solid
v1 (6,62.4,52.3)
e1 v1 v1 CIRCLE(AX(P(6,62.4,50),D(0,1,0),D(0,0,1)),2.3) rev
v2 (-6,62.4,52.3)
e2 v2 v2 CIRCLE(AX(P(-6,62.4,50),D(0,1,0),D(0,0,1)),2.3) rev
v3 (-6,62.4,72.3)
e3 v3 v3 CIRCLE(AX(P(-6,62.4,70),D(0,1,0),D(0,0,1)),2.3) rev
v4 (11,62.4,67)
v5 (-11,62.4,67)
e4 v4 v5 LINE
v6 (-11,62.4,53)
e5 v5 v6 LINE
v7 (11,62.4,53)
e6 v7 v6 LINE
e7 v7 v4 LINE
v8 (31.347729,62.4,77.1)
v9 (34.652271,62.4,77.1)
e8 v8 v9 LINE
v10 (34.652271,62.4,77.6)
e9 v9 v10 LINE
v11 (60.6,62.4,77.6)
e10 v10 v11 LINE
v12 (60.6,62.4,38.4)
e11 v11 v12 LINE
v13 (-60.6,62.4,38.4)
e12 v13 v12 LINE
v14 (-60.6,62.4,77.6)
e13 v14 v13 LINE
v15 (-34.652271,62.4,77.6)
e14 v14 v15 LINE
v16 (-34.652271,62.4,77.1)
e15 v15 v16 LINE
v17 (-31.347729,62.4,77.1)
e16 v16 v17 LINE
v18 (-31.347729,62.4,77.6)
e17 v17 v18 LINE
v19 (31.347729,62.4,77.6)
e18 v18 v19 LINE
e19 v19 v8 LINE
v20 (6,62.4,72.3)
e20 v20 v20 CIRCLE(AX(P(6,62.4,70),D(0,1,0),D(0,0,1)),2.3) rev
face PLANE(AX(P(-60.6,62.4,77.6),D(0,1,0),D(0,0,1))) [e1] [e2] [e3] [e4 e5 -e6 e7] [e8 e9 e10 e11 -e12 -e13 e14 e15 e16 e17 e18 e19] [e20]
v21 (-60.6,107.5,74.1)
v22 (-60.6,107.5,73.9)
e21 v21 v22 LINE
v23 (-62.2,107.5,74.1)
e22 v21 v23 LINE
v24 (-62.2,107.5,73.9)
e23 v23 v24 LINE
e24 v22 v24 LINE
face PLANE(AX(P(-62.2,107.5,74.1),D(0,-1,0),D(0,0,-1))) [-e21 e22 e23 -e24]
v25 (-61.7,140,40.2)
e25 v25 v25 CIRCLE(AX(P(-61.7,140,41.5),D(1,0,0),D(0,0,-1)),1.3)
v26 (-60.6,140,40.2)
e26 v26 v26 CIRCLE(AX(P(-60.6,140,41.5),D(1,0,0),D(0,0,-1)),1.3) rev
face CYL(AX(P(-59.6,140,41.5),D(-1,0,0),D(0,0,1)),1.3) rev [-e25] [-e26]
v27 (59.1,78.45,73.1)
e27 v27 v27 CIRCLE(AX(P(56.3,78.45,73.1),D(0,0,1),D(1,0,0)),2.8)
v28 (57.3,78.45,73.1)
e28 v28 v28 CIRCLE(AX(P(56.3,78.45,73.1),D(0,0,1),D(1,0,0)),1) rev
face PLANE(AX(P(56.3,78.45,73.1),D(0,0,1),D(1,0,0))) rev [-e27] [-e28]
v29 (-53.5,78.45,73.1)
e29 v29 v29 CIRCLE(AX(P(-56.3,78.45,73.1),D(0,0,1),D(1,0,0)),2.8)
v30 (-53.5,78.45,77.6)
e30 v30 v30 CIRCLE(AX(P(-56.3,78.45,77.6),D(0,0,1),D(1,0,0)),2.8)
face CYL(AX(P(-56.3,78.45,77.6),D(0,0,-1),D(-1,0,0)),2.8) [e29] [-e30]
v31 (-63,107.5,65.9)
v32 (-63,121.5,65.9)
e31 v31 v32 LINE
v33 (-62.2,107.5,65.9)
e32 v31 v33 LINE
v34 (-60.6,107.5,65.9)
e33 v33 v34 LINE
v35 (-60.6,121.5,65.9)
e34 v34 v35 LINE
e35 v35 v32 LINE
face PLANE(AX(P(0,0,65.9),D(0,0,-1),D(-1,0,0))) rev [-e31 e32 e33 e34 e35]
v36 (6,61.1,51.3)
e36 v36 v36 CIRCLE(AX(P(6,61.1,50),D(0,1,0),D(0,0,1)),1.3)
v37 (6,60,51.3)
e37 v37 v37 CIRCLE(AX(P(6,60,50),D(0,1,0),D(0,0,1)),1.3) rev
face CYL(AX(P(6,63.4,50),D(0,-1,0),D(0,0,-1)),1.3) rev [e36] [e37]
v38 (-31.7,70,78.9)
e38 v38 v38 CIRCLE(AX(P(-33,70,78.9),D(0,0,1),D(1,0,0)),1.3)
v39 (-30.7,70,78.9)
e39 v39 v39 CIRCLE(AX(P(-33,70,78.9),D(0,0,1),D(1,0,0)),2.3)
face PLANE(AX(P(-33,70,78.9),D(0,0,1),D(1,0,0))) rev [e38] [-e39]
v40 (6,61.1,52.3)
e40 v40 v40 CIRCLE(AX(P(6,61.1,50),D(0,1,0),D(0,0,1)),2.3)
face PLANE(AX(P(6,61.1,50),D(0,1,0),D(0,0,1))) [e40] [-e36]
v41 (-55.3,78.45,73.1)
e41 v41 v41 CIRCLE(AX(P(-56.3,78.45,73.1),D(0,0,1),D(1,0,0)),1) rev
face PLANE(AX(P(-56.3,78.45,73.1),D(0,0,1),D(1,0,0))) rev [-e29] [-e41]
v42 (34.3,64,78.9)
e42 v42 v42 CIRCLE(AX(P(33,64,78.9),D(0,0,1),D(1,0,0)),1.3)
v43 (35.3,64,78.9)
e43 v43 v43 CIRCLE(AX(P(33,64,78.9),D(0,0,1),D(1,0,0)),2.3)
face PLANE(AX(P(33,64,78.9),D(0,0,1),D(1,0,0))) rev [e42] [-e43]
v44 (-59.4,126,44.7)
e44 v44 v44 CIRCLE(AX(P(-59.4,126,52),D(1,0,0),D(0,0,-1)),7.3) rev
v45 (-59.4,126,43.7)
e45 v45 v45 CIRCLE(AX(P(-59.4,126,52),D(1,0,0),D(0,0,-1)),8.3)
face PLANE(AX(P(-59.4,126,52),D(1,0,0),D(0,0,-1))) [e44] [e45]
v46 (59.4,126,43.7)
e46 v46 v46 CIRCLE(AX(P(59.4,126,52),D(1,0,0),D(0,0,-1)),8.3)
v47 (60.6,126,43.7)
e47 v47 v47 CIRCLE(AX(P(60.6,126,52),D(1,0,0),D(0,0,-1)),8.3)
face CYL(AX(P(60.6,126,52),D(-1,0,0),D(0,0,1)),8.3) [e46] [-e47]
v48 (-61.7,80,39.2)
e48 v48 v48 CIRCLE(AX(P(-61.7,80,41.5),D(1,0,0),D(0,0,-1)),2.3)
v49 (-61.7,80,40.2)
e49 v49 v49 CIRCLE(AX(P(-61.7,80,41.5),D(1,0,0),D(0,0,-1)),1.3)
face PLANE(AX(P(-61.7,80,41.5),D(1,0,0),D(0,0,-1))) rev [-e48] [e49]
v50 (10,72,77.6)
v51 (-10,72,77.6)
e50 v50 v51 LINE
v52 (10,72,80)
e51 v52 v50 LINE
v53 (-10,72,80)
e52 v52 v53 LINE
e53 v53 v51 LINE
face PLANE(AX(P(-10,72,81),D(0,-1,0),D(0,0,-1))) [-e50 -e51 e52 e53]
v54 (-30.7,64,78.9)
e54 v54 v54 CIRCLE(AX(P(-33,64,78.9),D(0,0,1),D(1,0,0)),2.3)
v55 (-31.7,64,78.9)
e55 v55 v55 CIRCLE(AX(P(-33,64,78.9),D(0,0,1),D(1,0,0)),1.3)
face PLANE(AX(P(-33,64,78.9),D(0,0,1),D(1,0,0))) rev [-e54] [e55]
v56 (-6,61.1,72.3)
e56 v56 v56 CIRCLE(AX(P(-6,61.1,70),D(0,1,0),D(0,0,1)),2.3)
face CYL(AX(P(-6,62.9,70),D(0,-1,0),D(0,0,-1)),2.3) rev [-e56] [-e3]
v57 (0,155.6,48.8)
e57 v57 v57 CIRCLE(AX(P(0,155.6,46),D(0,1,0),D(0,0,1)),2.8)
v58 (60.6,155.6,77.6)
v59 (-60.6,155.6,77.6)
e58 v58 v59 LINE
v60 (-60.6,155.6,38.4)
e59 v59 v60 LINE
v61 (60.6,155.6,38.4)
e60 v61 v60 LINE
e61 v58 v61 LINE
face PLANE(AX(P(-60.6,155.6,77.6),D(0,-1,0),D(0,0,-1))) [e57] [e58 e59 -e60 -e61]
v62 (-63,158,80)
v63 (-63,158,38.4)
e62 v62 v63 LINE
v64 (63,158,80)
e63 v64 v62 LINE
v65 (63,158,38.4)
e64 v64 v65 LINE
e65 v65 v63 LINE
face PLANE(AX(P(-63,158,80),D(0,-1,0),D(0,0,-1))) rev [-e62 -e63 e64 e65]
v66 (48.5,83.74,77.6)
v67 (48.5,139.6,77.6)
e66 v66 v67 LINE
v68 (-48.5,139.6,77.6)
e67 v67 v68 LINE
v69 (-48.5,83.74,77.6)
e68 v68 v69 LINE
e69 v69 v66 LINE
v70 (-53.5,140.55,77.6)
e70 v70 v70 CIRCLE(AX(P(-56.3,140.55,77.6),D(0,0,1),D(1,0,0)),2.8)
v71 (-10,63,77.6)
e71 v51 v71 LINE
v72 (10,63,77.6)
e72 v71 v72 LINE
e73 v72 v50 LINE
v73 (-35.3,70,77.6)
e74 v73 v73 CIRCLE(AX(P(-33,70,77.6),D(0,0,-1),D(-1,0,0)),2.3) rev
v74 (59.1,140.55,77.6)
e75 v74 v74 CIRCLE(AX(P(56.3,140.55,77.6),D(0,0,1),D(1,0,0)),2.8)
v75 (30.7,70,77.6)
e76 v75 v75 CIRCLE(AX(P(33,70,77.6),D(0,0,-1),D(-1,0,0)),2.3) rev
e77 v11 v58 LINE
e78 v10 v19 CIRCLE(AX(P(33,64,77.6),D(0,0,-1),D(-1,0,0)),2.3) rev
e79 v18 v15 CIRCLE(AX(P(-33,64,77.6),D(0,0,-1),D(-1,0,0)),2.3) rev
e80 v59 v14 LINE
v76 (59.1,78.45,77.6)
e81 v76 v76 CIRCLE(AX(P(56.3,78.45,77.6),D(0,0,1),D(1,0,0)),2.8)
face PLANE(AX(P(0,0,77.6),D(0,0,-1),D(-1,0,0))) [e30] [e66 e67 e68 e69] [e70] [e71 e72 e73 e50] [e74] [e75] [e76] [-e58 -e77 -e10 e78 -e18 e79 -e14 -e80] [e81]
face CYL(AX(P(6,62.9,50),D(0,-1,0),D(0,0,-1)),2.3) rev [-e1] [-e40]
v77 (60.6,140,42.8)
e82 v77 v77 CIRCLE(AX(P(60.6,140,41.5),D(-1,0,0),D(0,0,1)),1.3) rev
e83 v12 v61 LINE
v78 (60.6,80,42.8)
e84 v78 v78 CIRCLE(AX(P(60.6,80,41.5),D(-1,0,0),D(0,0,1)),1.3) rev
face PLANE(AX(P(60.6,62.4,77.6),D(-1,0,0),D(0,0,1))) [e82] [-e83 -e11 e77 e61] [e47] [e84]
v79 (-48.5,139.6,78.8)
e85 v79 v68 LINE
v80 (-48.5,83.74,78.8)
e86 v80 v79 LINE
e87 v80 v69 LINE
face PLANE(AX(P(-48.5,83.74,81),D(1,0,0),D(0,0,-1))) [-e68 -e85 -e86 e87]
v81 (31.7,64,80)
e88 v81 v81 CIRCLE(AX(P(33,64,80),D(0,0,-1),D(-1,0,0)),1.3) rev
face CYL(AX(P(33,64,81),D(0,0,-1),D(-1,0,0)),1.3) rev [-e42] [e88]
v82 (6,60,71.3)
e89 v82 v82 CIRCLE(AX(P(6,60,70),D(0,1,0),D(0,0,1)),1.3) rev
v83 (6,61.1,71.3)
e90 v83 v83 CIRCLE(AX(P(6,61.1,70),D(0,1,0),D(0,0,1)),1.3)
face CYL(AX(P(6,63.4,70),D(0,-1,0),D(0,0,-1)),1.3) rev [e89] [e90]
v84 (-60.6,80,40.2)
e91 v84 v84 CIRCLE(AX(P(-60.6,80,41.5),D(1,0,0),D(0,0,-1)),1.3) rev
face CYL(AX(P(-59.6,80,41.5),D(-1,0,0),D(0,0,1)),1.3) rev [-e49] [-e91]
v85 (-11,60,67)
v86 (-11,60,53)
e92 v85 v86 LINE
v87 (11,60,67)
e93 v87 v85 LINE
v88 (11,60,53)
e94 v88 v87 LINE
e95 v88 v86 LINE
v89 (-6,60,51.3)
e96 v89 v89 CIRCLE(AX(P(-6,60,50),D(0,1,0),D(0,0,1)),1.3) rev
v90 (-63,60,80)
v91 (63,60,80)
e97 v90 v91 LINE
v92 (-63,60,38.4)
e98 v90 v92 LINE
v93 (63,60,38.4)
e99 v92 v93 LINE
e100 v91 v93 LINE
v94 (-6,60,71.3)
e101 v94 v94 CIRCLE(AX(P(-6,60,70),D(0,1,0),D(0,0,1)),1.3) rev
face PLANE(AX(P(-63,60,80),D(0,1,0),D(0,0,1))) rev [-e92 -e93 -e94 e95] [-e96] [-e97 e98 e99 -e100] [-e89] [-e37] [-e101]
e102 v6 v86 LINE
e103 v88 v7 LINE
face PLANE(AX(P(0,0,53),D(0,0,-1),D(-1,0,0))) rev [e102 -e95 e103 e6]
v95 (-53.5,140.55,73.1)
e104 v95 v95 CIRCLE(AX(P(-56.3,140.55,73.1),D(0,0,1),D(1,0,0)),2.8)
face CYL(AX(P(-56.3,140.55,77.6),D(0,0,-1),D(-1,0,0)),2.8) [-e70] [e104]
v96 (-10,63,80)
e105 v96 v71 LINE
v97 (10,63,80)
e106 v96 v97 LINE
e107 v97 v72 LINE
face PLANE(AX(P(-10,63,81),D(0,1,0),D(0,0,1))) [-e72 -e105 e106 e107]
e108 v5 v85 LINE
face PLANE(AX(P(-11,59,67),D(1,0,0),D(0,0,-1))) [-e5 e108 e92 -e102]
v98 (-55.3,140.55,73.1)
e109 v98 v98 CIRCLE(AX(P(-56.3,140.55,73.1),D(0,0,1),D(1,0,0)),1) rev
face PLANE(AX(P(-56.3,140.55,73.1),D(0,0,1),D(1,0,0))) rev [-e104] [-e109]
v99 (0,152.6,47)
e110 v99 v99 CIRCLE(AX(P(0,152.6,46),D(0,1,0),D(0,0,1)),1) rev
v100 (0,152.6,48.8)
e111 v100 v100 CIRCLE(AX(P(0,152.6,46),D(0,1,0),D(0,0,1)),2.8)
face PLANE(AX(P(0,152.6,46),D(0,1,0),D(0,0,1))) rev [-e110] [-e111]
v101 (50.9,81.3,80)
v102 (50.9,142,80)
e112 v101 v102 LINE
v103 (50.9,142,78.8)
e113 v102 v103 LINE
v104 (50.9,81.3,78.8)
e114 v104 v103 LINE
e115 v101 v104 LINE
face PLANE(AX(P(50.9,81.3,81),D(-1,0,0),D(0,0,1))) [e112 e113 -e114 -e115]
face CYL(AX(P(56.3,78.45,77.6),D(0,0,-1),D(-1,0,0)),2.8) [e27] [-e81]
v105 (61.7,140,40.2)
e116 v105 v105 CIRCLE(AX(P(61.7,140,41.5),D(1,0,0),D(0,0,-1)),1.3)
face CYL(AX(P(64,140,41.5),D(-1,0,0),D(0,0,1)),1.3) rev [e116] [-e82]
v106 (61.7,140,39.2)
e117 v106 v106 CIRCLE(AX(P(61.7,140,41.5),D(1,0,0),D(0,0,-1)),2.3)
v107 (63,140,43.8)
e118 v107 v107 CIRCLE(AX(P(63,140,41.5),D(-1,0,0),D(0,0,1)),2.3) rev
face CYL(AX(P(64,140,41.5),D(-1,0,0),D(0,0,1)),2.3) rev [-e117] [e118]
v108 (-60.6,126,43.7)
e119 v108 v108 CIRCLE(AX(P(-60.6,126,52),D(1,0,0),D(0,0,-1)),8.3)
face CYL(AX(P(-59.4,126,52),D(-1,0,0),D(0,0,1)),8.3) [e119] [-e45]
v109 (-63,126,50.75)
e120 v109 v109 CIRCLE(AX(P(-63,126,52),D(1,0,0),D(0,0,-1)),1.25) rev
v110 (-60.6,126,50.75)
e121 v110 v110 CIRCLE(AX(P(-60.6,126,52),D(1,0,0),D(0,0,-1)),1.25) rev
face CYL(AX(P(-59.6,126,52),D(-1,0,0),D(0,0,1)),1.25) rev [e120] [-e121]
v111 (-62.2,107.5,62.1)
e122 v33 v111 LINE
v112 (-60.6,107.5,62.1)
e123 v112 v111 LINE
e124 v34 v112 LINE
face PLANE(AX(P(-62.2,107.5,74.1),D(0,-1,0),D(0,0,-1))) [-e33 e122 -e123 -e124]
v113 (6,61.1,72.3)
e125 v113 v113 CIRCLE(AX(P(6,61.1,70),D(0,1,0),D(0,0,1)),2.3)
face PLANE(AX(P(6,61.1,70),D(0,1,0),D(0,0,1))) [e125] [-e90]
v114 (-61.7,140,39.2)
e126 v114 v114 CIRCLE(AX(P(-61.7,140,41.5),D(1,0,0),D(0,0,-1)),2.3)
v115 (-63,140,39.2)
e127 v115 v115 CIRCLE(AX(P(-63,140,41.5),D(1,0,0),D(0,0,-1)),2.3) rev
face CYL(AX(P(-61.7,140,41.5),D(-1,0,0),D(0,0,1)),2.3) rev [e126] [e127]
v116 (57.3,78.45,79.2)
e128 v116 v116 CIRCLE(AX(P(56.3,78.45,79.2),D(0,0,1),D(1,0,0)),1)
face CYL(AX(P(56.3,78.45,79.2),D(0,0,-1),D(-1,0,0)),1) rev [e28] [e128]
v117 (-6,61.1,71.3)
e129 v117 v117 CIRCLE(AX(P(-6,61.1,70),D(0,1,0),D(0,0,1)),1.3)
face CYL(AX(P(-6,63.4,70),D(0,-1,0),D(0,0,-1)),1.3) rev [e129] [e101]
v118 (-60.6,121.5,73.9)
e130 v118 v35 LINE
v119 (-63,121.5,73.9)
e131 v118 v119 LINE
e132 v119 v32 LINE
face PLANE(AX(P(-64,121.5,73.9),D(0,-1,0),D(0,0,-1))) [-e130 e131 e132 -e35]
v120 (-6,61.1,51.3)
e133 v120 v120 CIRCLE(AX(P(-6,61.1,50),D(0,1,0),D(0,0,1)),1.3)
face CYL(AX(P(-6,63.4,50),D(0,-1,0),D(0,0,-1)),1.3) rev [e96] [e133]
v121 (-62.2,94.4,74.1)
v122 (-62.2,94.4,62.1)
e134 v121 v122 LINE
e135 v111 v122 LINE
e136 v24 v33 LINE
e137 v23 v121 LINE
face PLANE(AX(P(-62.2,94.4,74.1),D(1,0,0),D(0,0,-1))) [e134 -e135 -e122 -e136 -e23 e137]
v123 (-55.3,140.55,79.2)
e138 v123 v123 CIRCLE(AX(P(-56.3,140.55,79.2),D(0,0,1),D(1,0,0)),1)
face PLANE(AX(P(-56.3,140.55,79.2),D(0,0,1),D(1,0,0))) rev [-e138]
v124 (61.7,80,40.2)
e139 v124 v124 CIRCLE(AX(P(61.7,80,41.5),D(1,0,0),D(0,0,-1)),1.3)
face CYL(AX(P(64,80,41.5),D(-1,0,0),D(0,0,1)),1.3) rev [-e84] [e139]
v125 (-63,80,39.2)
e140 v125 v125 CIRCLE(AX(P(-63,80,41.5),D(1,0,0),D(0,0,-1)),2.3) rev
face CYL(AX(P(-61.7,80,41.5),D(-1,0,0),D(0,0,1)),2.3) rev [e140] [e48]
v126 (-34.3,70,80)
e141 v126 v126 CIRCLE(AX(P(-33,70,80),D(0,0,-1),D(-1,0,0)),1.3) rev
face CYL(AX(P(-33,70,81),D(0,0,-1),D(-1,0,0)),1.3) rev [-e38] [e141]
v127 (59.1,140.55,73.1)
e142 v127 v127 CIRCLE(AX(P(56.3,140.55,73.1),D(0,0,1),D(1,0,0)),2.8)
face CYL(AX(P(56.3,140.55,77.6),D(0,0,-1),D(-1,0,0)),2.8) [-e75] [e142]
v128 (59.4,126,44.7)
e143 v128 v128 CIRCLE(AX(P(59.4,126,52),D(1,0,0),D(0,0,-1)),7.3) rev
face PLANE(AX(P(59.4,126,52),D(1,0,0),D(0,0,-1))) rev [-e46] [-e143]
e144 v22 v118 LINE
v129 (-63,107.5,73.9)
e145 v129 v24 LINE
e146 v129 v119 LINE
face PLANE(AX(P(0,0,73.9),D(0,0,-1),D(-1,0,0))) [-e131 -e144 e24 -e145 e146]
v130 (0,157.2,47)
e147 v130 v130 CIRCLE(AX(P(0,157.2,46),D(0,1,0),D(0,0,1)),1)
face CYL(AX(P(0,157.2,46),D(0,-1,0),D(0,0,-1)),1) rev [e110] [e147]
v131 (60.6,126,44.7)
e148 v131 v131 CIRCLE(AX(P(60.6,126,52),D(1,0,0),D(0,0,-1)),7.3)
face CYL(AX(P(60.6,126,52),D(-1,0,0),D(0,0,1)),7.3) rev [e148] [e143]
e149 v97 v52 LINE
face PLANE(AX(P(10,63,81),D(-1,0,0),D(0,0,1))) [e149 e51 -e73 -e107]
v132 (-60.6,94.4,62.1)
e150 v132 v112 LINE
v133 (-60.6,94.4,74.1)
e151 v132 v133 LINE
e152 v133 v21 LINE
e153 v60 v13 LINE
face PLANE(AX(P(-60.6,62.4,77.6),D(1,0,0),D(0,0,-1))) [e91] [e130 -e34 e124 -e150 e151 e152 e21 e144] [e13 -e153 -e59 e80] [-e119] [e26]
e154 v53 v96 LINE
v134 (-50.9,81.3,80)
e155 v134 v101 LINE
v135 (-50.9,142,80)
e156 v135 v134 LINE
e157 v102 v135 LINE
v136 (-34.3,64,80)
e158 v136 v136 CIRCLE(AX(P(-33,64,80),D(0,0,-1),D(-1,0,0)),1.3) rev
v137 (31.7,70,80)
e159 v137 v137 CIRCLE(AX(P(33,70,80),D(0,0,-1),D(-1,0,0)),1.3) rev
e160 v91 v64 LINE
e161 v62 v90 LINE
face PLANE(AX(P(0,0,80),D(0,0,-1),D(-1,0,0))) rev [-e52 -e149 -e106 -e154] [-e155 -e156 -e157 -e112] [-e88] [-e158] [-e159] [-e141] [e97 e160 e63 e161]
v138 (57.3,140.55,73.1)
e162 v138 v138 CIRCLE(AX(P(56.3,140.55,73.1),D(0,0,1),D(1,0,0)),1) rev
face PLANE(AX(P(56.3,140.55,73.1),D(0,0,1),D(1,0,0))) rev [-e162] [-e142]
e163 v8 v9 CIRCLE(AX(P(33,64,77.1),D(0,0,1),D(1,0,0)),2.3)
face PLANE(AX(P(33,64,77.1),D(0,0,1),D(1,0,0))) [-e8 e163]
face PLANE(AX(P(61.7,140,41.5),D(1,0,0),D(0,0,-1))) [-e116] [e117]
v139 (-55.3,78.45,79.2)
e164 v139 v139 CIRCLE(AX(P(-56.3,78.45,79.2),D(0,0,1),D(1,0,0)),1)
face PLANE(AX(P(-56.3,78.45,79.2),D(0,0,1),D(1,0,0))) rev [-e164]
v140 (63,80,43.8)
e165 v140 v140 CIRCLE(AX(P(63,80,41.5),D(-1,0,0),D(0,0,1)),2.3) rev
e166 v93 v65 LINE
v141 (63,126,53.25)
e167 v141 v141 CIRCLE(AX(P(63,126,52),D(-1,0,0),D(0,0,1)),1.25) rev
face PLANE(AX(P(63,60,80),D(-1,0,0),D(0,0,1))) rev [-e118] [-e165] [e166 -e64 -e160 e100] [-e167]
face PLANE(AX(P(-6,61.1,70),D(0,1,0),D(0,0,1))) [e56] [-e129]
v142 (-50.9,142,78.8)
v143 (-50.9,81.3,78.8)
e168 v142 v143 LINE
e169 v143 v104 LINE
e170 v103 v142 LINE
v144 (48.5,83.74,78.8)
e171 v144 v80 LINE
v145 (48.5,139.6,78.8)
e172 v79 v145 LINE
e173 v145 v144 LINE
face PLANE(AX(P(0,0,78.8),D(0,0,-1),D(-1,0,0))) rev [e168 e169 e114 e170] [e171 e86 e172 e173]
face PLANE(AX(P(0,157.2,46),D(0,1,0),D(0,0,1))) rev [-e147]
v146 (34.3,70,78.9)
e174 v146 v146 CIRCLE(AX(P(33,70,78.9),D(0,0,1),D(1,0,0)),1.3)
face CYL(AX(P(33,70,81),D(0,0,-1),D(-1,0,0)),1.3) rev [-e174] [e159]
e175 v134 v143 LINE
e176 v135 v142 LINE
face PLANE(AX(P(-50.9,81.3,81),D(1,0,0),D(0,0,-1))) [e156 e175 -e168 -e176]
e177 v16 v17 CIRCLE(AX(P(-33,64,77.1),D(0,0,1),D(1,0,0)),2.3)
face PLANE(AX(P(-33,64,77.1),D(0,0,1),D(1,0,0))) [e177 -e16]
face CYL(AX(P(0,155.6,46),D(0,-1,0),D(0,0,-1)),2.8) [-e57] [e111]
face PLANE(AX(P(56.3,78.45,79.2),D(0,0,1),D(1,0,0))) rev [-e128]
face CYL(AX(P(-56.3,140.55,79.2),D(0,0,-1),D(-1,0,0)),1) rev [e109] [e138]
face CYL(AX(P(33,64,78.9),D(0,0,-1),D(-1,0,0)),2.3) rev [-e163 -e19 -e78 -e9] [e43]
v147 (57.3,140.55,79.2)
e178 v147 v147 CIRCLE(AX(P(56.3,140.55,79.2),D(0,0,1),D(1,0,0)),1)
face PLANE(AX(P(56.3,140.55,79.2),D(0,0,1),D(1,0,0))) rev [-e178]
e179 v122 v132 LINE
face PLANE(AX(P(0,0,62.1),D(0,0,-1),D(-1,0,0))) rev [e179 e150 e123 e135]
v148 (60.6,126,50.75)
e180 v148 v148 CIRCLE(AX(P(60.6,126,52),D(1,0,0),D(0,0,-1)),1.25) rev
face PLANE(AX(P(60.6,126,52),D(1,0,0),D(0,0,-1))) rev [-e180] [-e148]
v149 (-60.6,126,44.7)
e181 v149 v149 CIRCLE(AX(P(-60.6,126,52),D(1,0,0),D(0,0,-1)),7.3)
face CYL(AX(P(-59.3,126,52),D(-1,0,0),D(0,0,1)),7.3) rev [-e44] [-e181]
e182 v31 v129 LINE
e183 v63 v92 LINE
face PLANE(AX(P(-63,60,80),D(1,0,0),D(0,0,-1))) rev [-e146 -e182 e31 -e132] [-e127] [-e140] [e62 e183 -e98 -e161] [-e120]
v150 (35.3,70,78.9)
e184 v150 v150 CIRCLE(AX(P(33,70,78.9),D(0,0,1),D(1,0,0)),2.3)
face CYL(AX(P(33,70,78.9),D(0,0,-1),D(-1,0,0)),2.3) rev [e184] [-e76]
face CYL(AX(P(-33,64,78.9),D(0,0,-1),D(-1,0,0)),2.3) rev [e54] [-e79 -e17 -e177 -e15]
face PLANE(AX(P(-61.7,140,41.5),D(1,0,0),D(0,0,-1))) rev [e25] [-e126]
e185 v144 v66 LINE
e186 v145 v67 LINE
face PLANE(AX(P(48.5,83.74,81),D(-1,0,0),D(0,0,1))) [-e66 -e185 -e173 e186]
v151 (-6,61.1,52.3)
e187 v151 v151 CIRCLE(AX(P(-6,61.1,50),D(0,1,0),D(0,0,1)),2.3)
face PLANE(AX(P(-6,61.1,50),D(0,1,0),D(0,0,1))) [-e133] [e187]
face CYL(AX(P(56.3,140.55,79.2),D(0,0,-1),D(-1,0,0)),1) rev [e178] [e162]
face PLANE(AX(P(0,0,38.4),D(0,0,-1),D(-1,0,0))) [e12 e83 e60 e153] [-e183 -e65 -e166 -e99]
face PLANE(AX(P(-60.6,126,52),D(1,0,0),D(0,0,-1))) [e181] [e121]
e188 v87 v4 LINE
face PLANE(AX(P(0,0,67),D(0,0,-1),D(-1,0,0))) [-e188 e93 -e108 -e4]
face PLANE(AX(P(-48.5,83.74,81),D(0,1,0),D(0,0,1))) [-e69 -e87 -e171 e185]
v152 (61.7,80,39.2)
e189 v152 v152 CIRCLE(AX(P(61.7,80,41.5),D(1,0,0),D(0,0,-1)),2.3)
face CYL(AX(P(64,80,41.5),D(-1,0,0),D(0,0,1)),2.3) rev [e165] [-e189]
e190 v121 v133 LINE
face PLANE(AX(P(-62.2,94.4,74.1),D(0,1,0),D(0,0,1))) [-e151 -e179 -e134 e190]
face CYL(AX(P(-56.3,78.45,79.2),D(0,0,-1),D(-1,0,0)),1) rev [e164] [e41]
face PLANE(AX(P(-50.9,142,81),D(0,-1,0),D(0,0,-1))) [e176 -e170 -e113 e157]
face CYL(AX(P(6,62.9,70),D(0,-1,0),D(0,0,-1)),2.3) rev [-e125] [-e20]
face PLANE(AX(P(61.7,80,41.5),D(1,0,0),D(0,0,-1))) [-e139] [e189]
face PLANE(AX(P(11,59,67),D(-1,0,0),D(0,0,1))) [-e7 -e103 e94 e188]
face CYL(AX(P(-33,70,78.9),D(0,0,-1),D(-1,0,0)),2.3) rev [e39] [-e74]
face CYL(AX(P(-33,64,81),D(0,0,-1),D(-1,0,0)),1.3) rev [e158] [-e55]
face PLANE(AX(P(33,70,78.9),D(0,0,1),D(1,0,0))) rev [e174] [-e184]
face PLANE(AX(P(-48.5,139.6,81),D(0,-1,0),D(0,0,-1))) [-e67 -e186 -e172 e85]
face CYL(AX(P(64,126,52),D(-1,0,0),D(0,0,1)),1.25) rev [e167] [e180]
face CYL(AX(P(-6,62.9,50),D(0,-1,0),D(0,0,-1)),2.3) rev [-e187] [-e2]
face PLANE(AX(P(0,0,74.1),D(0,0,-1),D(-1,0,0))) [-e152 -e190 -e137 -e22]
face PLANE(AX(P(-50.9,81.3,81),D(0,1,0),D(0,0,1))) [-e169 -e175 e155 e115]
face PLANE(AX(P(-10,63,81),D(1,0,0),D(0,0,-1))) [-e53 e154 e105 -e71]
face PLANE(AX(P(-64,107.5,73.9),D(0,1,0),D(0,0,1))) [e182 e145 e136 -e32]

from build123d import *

# Parameters (mm, degrees)
BOSS_EXTRUDE1_START  = 38.4
SKETCH1_W            = 126
SKETCH1_H            = 98
BOSS_EXTRUDE1_DEPTH  = 41.6
BOSS_EXTRUDE2_START  = 36
SKETCH2_W            = 121.2
SKETCH2_H            = 93.2
BOSS_EXTRUDE2_DEPTH  = 41.6
BOSS_EXTRUDE3_START  = 76.6
SKETCH3_W            = 97
SKETCH3_H            = 55.86
BOSS_EXTRUDE3_DEPTH  = 4.4
BOSS_EXTRUDE4_START  = 78.8
SKETCH4_W            = 101.8
SKETCH4_H            = 60.7
BOSS_EXTRUDE4_DEPTH  = 2.2
BOSS_EXTRUDE5_START  = 73.1
SKETCH5_R            = 2.8
BOSS_EXTRUDE5_DEPTH  = 4.5
BOSS_EXTRUDE6_START  = 72.1
SKETCH6_R            = 1
BOSS_EXTRUDE6_DEPTH  = 7.1
BOSS_EXTRUDE7_START  = 73.1
SKETCH7_R            = 2.8
BOSS_EXTRUDE7_DEPTH  = 4.5
BOSS_EXTRUDE8_START  = 72.1
SKETCH8_R            = 1
BOSS_EXTRUDE8_DEPTH  = 7.1
BOSS_EXTRUDE9_START  = 73.1
SKETCH9_R            = 2.8
BOSS_EXTRUDE9_DEPTH  = 4.5
BOSS_EXTRUDE10_START = 72.1
SKETCH10_R           = 1
BOSS_EXTRUDE10_DEPTH = 7.1
BOSS_EXTRUDE11_START = 73.1
SKETCH11_R           = 2.8
BOSS_EXTRUDE11_DEPTH = 4.5
BOSS_EXTRUDE12_START = 72.1
SKETCH12_R           = 1
BOSS_EXTRUDE12_DEPTH = 7.1
BOSS_EXTRUDE13_START = 65.9
SKETCH13_W           = 3.9
SKETCH13_H           = 14
BOSS_EXTRUDE13_DEPTH = 8
BOSS_EXTRUDE14_START = 62.1
SKETCH14_W           = 2.1
SKETCH14_H           = 13.1
BOSS_EXTRUDE14_DEPTH = 12
BOSS_EXTRUDE15_START = -60.6
SKETCH15_R           = 8.3
BOSS_EXTRUDE15_DEPTH = 1.2
BOSS_EXTRUDE16_START = -60.6
SKETCH16_R           = 7.3
BOSS_EXTRUDE16_DEPTH = 1.3
BOSS_EXTRUDE17_START = -64
SKETCH17_R           = 1.25
BOSS_EXTRUDE17_DEPTH = 4.4
BOSS_EXTRUDE18_START = -64
SKETCH18_R           = 1.3
BOSS_EXTRUDE18_DEPTH = 4.4
BOSS_EXTRUDE19_START = -64
SKETCH19_R           = 2.3
BOSS_EXTRUDE19_DEPTH = 2.3
BOSS_EXTRUDE20_START = -64
SKETCH20_R           = 1.3
BOSS_EXTRUDE20_DEPTH = 4.4
BOSS_EXTRUDE21_START = -64
SKETCH21_R           = 2.3
BOSS_EXTRUDE21_DEPTH = 2.3
BOSS_EXTRUDE22_START = 59.4
SKETCH22_R           = 8.3
BOSS_EXTRUDE22_DEPTH = 1.2
BOSS_EXTRUDE23_START = 59.3
SKETCH23_R           = 7.3
BOSS_EXTRUDE23_DEPTH = 1.3
BOSS_EXTRUDE24_START = 59.6
SKETCH24_R           = 1.25
BOSS_EXTRUDE24_DEPTH = 4.4
BOSS_EXTRUDE25_START = 59.6
SKETCH25_R           = 1.3
BOSS_EXTRUDE25_DEPTH = 4.4
BOSS_EXTRUDE26_START = 61.7
SKETCH26_R           = 2.3
BOSS_EXTRUDE26_DEPTH = 2.3
BOSS_EXTRUDE27_START = 59.6
SKETCH27_R           = 1.3
BOSS_EXTRUDE27_DEPTH = 4.4
BOSS_EXTRUDE28_START = 61.7
SKETCH28_R           = 2.3
BOSS_EXTRUDE28_DEPTH = 2.3
BOSS_EXTRUDE29_START = 53
SKETCH29_W           = 22
SKETCH29_H           = 4.4
BOSS_EXTRUDE29_DEPTH = 14
BOSS_EXTRUDE30_START = 59
SKETCH30_R           = 1.3
BOSS_EXTRUDE30_DEPTH = 4.4
BOSS_EXTRUDE31_START = 61.1
SKETCH31_R           = 2.3
BOSS_EXTRUDE31_DEPTH = 1.8
BOSS_EXTRUDE32_START = 59
SKETCH32_R           = 1.3
BOSS_EXTRUDE32_DEPTH = 4.4
BOSS_EXTRUDE33_START = 61.1
SKETCH33_R           = 2.3
BOSS_EXTRUDE33_DEPTH = 1.8
BOSS_EXTRUDE34_START = 59
SKETCH34_R           = 1.3
BOSS_EXTRUDE34_DEPTH = 4.4
BOSS_EXTRUDE35_START = 61.1
SKETCH35_R           = 2.3
BOSS_EXTRUDE35_DEPTH = 1.8
BOSS_EXTRUDE36_START = 59
SKETCH36_R           = 1.3
BOSS_EXTRUDE36_DEPTH = 4.4
BOSS_EXTRUDE37_START = 61.1
SKETCH37_R           = 2.3
BOSS_EXTRUDE37_DEPTH = 1.8
BOSS_EXTRUDE38_START = 76.6
SKETCH38_W           = 20
SKETCH38_H           = 9
BOSS_EXTRUDE38_DEPTH = 4.4
BOSS_EXTRUDE39_START = 76.6
SKETCH39_R           = 1.3
BOSS_EXTRUDE39_DEPTH = 4.4
BOSS_EXTRUDE40_START = 77.1
SKETCH40_R           = 2.3
BOSS_EXTRUDE40_DEPTH = 1.8
BOSS_EXTRUDE41_START = 76.6
SKETCH41_R           = 1.3
BOSS_EXTRUDE41_DEPTH = 4.4
BOSS_EXTRUDE42_START = 77.1
SKETCH42_R           = 2.3
BOSS_EXTRUDE42_DEPTH = 1.8
BOSS_EXTRUDE43_START = 76.6
SKETCH43_R           = 1.3
BOSS_EXTRUDE43_DEPTH = 4.4
BOSS_EXTRUDE44_START = 77.1
SKETCH44_R           = 2.3
BOSS_EXTRUDE44_DEPTH = 1.8
BOSS_EXTRUDE45_START = 76.6
SKETCH45_R           = 1.3
BOSS_EXTRUDE45_DEPTH = 4.4
BOSS_EXTRUDE46_START = 77.1
SKETCH46_R           = 2.3
BOSS_EXTRUDE46_DEPTH = 1.8
BOSS_EXTRUDE47_START = 152.6
SKETCH47_R           = 2.8
BOSS_EXTRUDE47_DEPTH = 3
BOSS_EXTRUDE48_START = 152.1
SKETCH48_R           = 1
BOSS_EXTRUDE48_DEPTH = 5.1


with BuildPart() as part:
    # Sketch1 → Boss-Extrude1 (new body)
    with BuildSketch(Plane.XY.offset(BOSS_EXTRUDE1_START)):
        with Locations((0, 109)):
            Rectangle(SKETCH1_W, SKETCH1_H)
    extrude(amount=BOSS_EXTRUDE1_DEPTH)


with BuildPart() as body_2:
    # Sketch2 → Boss-Extrude2 (new body)
    with BuildSketch(Plane.XY.offset(BOSS_EXTRUDE2_START)):
        with Locations((0, 109)):
            Rectangle(SKETCH2_W, SKETCH2_H)
    extrude(amount=BOSS_EXTRUDE2_DEPTH)


with BuildPart() as part_1:
    add(part.part)

    # Combine1: cut body 2
    add(body_2.part, mode=Mode.SUBTRACT)


with BuildPart() as body_2_2:
    # Sketch3 → Boss-Extrude3 (new body)
    with BuildSketch(Plane.XY.offset(BOSS_EXTRUDE3_START)):
        with Locations((0, 111.67)):
            Rectangle(SKETCH3_W, SKETCH3_H)
    extrude(amount=BOSS_EXTRUDE3_DEPTH)


with BuildPart() as part_2:
    add(part_1.part)

    # Combine2: cut body 2 2
    add(body_2_2.part, mode=Mode.SUBTRACT)


with BuildPart() as body_2_3:
    # Sketch4 → Boss-Extrude4 (new body)
    with BuildSketch(Plane.XY.offset(BOSS_EXTRUDE4_START)):
        with Locations((0, 111.65)):
            Rectangle(SKETCH4_W, SKETCH4_H)
    extrude(amount=BOSS_EXTRUDE4_DEPTH)


with BuildPart() as part_3:
    add(part_2.part)

    # Combine3: cut body 2 3
    add(body_2_3.part, mode=Mode.SUBTRACT)

    # Sketch5 → Boss-Extrude5 (add)
    with BuildSketch(Plane.XY.offset(BOSS_EXTRUDE5_START)):
        with Locations((-56.3, 78.45)):
            Circle(SKETCH5_R)
    extrude(amount=BOSS_EXTRUDE5_DEPTH)


with BuildPart() as body_2_4:
    # Sketch6 → Boss-Extrude6 (new body)
    with BuildSketch(Plane.XY.offset(BOSS_EXTRUDE6_START)):
        with Locations((-56.3, 78.45)):
            Circle(SKETCH6_R)
    extrude(amount=BOSS_EXTRUDE6_DEPTH)


with BuildPart() as part_4:
    add(part_3.part)

    # Combine4: cut body 2 4
    add(body_2_4.part, mode=Mode.SUBTRACT)

    # Sketch7 → Boss-Extrude7 (add)
    with BuildSketch(Plane.XY.offset(BOSS_EXTRUDE7_START)):
        with Locations((-56.3, 140.55)):
            Circle(SKETCH7_R)
    extrude(amount=BOSS_EXTRUDE7_DEPTH)


with BuildPart() as body_2_5:
    # Sketch8 → Boss-Extrude8 (new body)
    with BuildSketch(Plane.XY.offset(BOSS_EXTRUDE8_START)):
        with Locations((-56.3, 140.55)):
            Circle(SKETCH8_R)
    extrude(amount=BOSS_EXTRUDE8_DEPTH)


with BuildPart() as part_5:
    add(part_4.part)

    # Combine5: cut body 2 5
    add(body_2_5.part, mode=Mode.SUBTRACT)

    # Sketch9 → Boss-Extrude9 (add)
    with BuildSketch(Plane.XY.offset(BOSS_EXTRUDE9_START)):
        with Locations((56.3, 78.45)):
            Circle(SKETCH9_R)
    extrude(amount=BOSS_EXTRUDE9_DEPTH)


with BuildPart() as body_2_6:
    # Sketch10 → Boss-Extrude10 (new body)
    with BuildSketch(Plane.XY.offset(BOSS_EXTRUDE10_START)):
        with Locations((56.3, 78.45)):
            Circle(SKETCH10_R)
    extrude(amount=BOSS_EXTRUDE10_DEPTH)


with BuildPart() as part_6:
    add(part_5.part)

    # Combine6: cut body 2 6
    add(body_2_6.part, mode=Mode.SUBTRACT)

    # Sketch11 → Boss-Extrude11 (add)
    with BuildSketch(Plane.XY.offset(BOSS_EXTRUDE11_START)):
        with Locations((56.3, 140.55)):
            Circle(SKETCH11_R)
    extrude(amount=BOSS_EXTRUDE11_DEPTH)


with BuildPart() as body_2_7:
    # Sketch12 → Boss-Extrude12 (new body)
    with BuildSketch(Plane.XY.offset(BOSS_EXTRUDE12_START)):
        with Locations((56.3, 140.55)):
            Circle(SKETCH12_R)
    extrude(amount=BOSS_EXTRUDE12_DEPTH)


with BuildPart() as part_7:
    add(part_6.part)

    # Combine7: cut body 2 7
    add(body_2_7.part, mode=Mode.SUBTRACT)


with BuildPart() as body_2_8:
    # Sketch13 → Boss-Extrude13 (new body)
    with BuildSketch(Plane.XY.offset(BOSS_EXTRUDE13_START)):
        with Locations((-62.05, 114.5)):
            Rectangle(SKETCH13_W, SKETCH13_H)
    extrude(amount=BOSS_EXTRUDE13_DEPTH)


with BuildPart() as part_8:
    add(part_7.part)

    # Combine8: cut body 2 8
    add(body_2_8.part, mode=Mode.SUBTRACT)


with BuildPart() as body_2_9:
    # Sketch14 → Boss-Extrude14 (new body)
    with BuildSketch(Plane.XY.offset(BOSS_EXTRUDE14_START)):
        with Locations((-61.15, 100.95)):
            Rectangle(SKETCH14_W, SKETCH14_H)
    extrude(amount=BOSS_EXTRUDE14_DEPTH)


with BuildPart() as part_9:
    add(part_8.part)

    # Combine9: cut body 2 9
    add(body_2_9.part, mode=Mode.SUBTRACT)

    # Sketch15 → Boss-Extrude15 (add)
    with BuildSketch(Plane(origin=(0, 0, 0), x_dir=(0, 0, -1), z_dir=(1, 0, 0)).offset(BOSS_EXTRUDE15_START)):
        with Locations((-52, 126)):
            Circle(SKETCH15_R)
    extrude(amount=BOSS_EXTRUDE15_DEPTH)


with BuildPart() as body_2_10:
    # Sketch16 → Boss-Extrude16 (new body)
    with BuildSketch(Plane(origin=(0, 0, 0), x_dir=(0, 0, -1), z_dir=(1, 0, 0)).offset(BOSS_EXTRUDE16_START)):
        with Locations((-52, 126)):
            Circle(SKETCH16_R)
    extrude(amount=BOSS_EXTRUDE16_DEPTH)


with BuildPart() as part_10:
    add(part_9.part)

    # Combine10: cut body 2 10
    add(body_2_10.part, mode=Mode.SUBTRACT)


with BuildPart() as body_2_11:
    # Sketch17 → Boss-Extrude17 (new body)
    with BuildSketch(Plane(origin=(0, 0, 0), x_dir=(0, 0, -1), z_dir=(1, 0, 0)).offset(BOSS_EXTRUDE17_START)):
        with Locations((-52, 126)):
            Circle(SKETCH17_R)
    extrude(amount=BOSS_EXTRUDE17_DEPTH)


with BuildPart() as part_11:
    add(part_10.part)

    # Combine11: cut body 2 11
    add(body_2_11.part, mode=Mode.SUBTRACT)


with BuildPart() as body_2_12:
    # Sketch18 → Boss-Extrude18 (new body)
    with BuildSketch(Plane(origin=(0, 0, 0), x_dir=(0, 0, -1), z_dir=(1, 0, 0)).offset(BOSS_EXTRUDE18_START)):
        with Locations((-41.5, 80)):
            Circle(SKETCH18_R)
    extrude(amount=BOSS_EXTRUDE18_DEPTH)


with BuildPart() as part_12:
    add(part_11.part)

    # Combine12: cut body 2 12
    add(body_2_12.part, mode=Mode.SUBTRACT)


with BuildPart() as body_2_13:
    # Sketch19 → Boss-Extrude19 (new body)
    with BuildSketch(Plane(origin=(0, 0, 0), x_dir=(0, 0, -1), z_dir=(1, 0, 0)).offset(BOSS_EXTRUDE19_START)):
        with Locations((-41.5, 80)):
            Circle(SKETCH19_R)
    extrude(amount=BOSS_EXTRUDE19_DEPTH)


with BuildPart() as part_13:
    add(part_12.part)

    # Combine13: cut body 2 13
    add(body_2_13.part, mode=Mode.SUBTRACT)


with BuildPart() as body_2_14:
    # Sketch20 → Boss-Extrude20 (new body)
    with BuildSketch(Plane(origin=(0, 0, 0), x_dir=(0, 0, -1), z_dir=(1, 0, 0)).offset(BOSS_EXTRUDE20_START)):
        with Locations((-41.5, 140)):
            Circle(SKETCH20_R)
    extrude(amount=BOSS_EXTRUDE20_DEPTH)


with BuildPart() as part_14:
    add(part_13.part)

    # Combine14: cut body 2 14
    add(body_2_14.part, mode=Mode.SUBTRACT)


with BuildPart() as body_2_15:
    # Sketch21 → Boss-Extrude21 (new body)
    with BuildSketch(Plane(origin=(0, 0, 0), x_dir=(0, 0, -1), z_dir=(1, 0, 0)).offset(BOSS_EXTRUDE21_START)):
        with Locations((-41.5, 140)):
            Circle(SKETCH21_R)
    extrude(amount=BOSS_EXTRUDE21_DEPTH)


with BuildPart() as part_15:
    add(part_14.part)

    # Combine15: cut body 2 15
    add(body_2_15.part, mode=Mode.SUBTRACT)

    # Sketch22 → Boss-Extrude22 (add)
    with BuildSketch(Plane(origin=(0, 0, 0), x_dir=(0, 0, -1), z_dir=(1, 0, 0)).offset(BOSS_EXTRUDE22_START)):
        with Locations((-52, 126)):
            Circle(SKETCH22_R)
    extrude(amount=BOSS_EXTRUDE22_DEPTH)


with BuildPart() as body_2_16:
    # Sketch23 → Boss-Extrude23 (new body)
    with BuildSketch(Plane(origin=(0, 0, 0), x_dir=(0, 0, -1), z_dir=(1, 0, 0)).offset(BOSS_EXTRUDE23_START)):
        with Locations((-52, 126)):
            Circle(SKETCH23_R)
    extrude(amount=BOSS_EXTRUDE23_DEPTH)


with BuildPart() as part_16:
    add(part_15.part)

    # Combine16: cut body 2 16
    add(body_2_16.part, mode=Mode.SUBTRACT)


with BuildPart() as body_2_17:
    # Sketch24 → Boss-Extrude24 (new body)
    with BuildSketch(Plane(origin=(0, 0, 0), x_dir=(0, 0, -1), z_dir=(1, 0, 0)).offset(BOSS_EXTRUDE24_START)):
        with Locations((-52, 126)):
            Circle(SKETCH24_R)
    extrude(amount=BOSS_EXTRUDE24_DEPTH)


with BuildPart() as part_17:
    add(part_16.part)

    # Combine17: cut body 2 17
    add(body_2_17.part, mode=Mode.SUBTRACT)


with BuildPart() as body_2_18:
    # Sketch25 → Boss-Extrude25 (new body)
    with BuildSketch(Plane(origin=(0, 0, 0), x_dir=(0, 0, -1), z_dir=(1, 0, 0)).offset(BOSS_EXTRUDE25_START)):
        with Locations((-41.5, 80)):
            Circle(SKETCH25_R)
    extrude(amount=BOSS_EXTRUDE25_DEPTH)


with BuildPart() as part_18:
    add(part_17.part)

    # Combine18: cut body 2 18
    add(body_2_18.part, mode=Mode.SUBTRACT)


with BuildPart() as body_2_19:
    # Sketch26 → Boss-Extrude26 (new body)
    with BuildSketch(Plane(origin=(0, 0, 0), x_dir=(0, 0, -1), z_dir=(1, 0, 0)).offset(BOSS_EXTRUDE26_START)):
        with Locations((-41.5, 80)):
            Circle(SKETCH26_R)
    extrude(amount=BOSS_EXTRUDE26_DEPTH)


with BuildPart() as part_19:
    add(part_18.part)

    # Combine19: cut body 2 19
    add(body_2_19.part, mode=Mode.SUBTRACT)


with BuildPart() as body_2_20:
    # Sketch27 → Boss-Extrude27 (new body)
    with BuildSketch(Plane(origin=(0, 0, 0), x_dir=(0, 0, -1), z_dir=(1, 0, 0)).offset(BOSS_EXTRUDE27_START)):
        with Locations((-41.5, 140)):
            Circle(SKETCH27_R)
    extrude(amount=BOSS_EXTRUDE27_DEPTH)


with BuildPart() as part_20:
    add(part_19.part)

    # Combine20: cut body 2 20
    add(body_2_20.part, mode=Mode.SUBTRACT)


with BuildPart() as body_2_21:
    # Sketch28 → Boss-Extrude28 (new body)
    with BuildSketch(Plane(origin=(0, 0, 0), x_dir=(0, 0, -1), z_dir=(1, 0, 0)).offset(BOSS_EXTRUDE28_START)):
        with Locations((-41.5, 140)):
            Circle(SKETCH28_R)
    extrude(amount=BOSS_EXTRUDE28_DEPTH)


with BuildPart() as part_21:
    add(part_20.part)

    # Combine21: cut body 2 21
    add(body_2_21.part, mode=Mode.SUBTRACT)


with BuildPart() as body_2_22:
    # Sketch29 → Boss-Extrude29 (new body)
    with BuildSketch(Plane.XY.offset(BOSS_EXTRUDE29_START)):
        with Locations((0, 61.2)):
            Rectangle(SKETCH29_W, SKETCH29_H)
    extrude(amount=BOSS_EXTRUDE29_DEPTH)


with BuildPart() as part_22:
    add(part_21.part)

    # Combine22: cut body 2 22
    add(body_2_22.part, mode=Mode.SUBTRACT)


with BuildPart() as body_2_23:
    # Sketch30 → Boss-Extrude30 (new body)
    with BuildSketch(Plane(origin=(0, 0, 0), x_dir=(1, 0, 0), z_dir=(0, 1, 0)).offset(BOSS_EXTRUDE30_START)):
        with Locations((-6, -50)):
            Circle(SKETCH30_R)
    extrude(amount=BOSS_EXTRUDE30_DEPTH)


with BuildPart() as part_23:
    add(part_22.part)

    # Combine23: cut body 2 23
    add(body_2_23.part, mode=Mode.SUBTRACT)


with BuildPart() as body_2_24:
    # Sketch31 → Boss-Extrude31 (new body)
    with BuildSketch(Plane(origin=(0, 0, 0), x_dir=(1, 0, 0), z_dir=(0, 1, 0)).offset(BOSS_EXTRUDE31_START)):
        with Locations((-6, -50)):
            Circle(SKETCH31_R)
    extrude(amount=BOSS_EXTRUDE31_DEPTH)


with BuildPart() as part_24:
    add(part_23.part)

    # Combine24: cut body 2 24
    add(body_2_24.part, mode=Mode.SUBTRACT)


with BuildPart() as body_2_25:
    # Sketch32 → Boss-Extrude32 (new body)
    with BuildSketch(Plane(origin=(0, 0, 0), x_dir=(1, 0, 0), z_dir=(0, 1, 0)).offset(BOSS_EXTRUDE32_START)):
        with Locations((-6, -70)):
            Circle(SKETCH32_R)
    extrude(amount=BOSS_EXTRUDE32_DEPTH)


with BuildPart() as part_25:
    add(part_24.part)

    # Combine25: cut body 2 25
    add(body_2_25.part, mode=Mode.SUBTRACT)


with BuildPart() as body_2_26:
    # Sketch33 → Boss-Extrude33 (new body)
    with BuildSketch(Plane(origin=(0, 0, 0), x_dir=(1, 0, 0), z_dir=(0, 1, 0)).offset(BOSS_EXTRUDE33_START)):
        with Locations((-6, -70)):
            Circle(SKETCH33_R)
    extrude(amount=BOSS_EXTRUDE33_DEPTH)


with BuildPart() as part_26:
    add(part_25.part)

    # Combine26: cut body 2 26
    add(body_2_26.part, mode=Mode.SUBTRACT)


with BuildPart() as body_2_27:
    # Sketch34 → Boss-Extrude34 (new body)
    with BuildSketch(Plane(origin=(0, 0, 0), x_dir=(1, 0, 0), z_dir=(0, 1, 0)).offset(BOSS_EXTRUDE34_START)):
        with Locations((6, -50)):
            Circle(SKETCH34_R)
    extrude(amount=BOSS_EXTRUDE34_DEPTH)


with BuildPart() as part_27:
    add(part_26.part)

    # Combine27: cut body 2 27
    add(body_2_27.part, mode=Mode.SUBTRACT)


with BuildPart() as body_2_28:
    # Sketch35 → Boss-Extrude35 (new body)
    with BuildSketch(Plane(origin=(0, 0, 0), x_dir=(1, 0, 0), z_dir=(0, 1, 0)).offset(BOSS_EXTRUDE35_START)):
        with Locations((6, -50)):
            Circle(SKETCH35_R)
    extrude(amount=BOSS_EXTRUDE35_DEPTH)


with BuildPart() as part_28:
    add(part_27.part)

    # Combine28: cut body 2 28
    add(body_2_28.part, mode=Mode.SUBTRACT)


with BuildPart() as body_2_29:
    # Sketch36 → Boss-Extrude36 (new body)
    with BuildSketch(Plane(origin=(0, 0, 0), x_dir=(1, 0, 0), z_dir=(0, 1, 0)).offset(BOSS_EXTRUDE36_START)):
        with Locations((6, -70)):
            Circle(SKETCH36_R)
    extrude(amount=BOSS_EXTRUDE36_DEPTH)


with BuildPart() as part_29:
    add(part_28.part)

    # Combine29: cut body 2 29
    add(body_2_29.part, mode=Mode.SUBTRACT)


with BuildPart() as body_2_30:
    # Sketch37 → Boss-Extrude37 (new body)
    with BuildSketch(Plane(origin=(0, 0, 0), x_dir=(1, 0, 0), z_dir=(0, 1, 0)).offset(BOSS_EXTRUDE37_START)):
        with Locations((6, -70)):
            Circle(SKETCH37_R)
    extrude(amount=BOSS_EXTRUDE37_DEPTH)


with BuildPart() as part_30:
    add(part_29.part)

    # Combine30: cut body 2 30
    add(body_2_30.part, mode=Mode.SUBTRACT)


with BuildPart() as body_2_31:
    # Sketch38 → Boss-Extrude38 (new body)
    with BuildSketch(Plane.XY.offset(BOSS_EXTRUDE38_START)):
        with Locations((0, 67.5)):
            Rectangle(SKETCH38_W, SKETCH38_H)
    extrude(amount=BOSS_EXTRUDE38_DEPTH)


with BuildPart() as part_31:
    add(part_30.part)

    # Combine31: cut body 2 31
    add(body_2_31.part, mode=Mode.SUBTRACT)


with BuildPart() as body_2_32:
    # Sketch39 → Boss-Extrude39 (new body)
    with BuildSketch(Plane.XY.offset(BOSS_EXTRUDE39_START)):
        with Locations((-33, 64)):
            Circle(SKETCH39_R)
    extrude(amount=BOSS_EXTRUDE39_DEPTH)


with BuildPart() as part_32:
    add(part_31.part)

    # Combine32: cut body 2 32
    add(body_2_32.part, mode=Mode.SUBTRACT)


with BuildPart() as body_2_33:
    # Sketch40 → Boss-Extrude40 (new body)
    with BuildSketch(Plane.XY.offset(BOSS_EXTRUDE40_START)):
        with Locations((-33, 64)):
            Circle(SKETCH40_R)
    extrude(amount=BOSS_EXTRUDE40_DEPTH)


with BuildPart() as part_33:
    add(part_32.part)

    # Combine33: cut body 2 33
    add(body_2_33.part, mode=Mode.SUBTRACT)


with BuildPart() as body_2_34:
    # Sketch41 → Boss-Extrude41 (new body)
    with BuildSketch(Plane.XY.offset(BOSS_EXTRUDE41_START)):
        with Locations((-33, 70)):
            Circle(SKETCH41_R)
    extrude(amount=BOSS_EXTRUDE41_DEPTH)


with BuildPart() as part_34:
    add(part_33.part)

    # Combine34: cut body 2 34
    add(body_2_34.part, mode=Mode.SUBTRACT)


with BuildPart() as body_2_35:
    # Sketch42 → Boss-Extrude42 (new body)
    with BuildSketch(Plane.XY.offset(BOSS_EXTRUDE42_START)):
        with Locations((-33, 70)):
            Circle(SKETCH42_R)
    extrude(amount=BOSS_EXTRUDE42_DEPTH)


with BuildPart() as part_35:
    add(part_34.part)

    # Combine35: cut body 2 35
    add(body_2_35.part, mode=Mode.SUBTRACT)


with BuildPart() as body_2_36:
    # Sketch43 → Boss-Extrude43 (new body)
    with BuildSketch(Plane.XY.offset(BOSS_EXTRUDE43_START)):
        with Locations((33, 64)):
            Circle(SKETCH43_R)
    extrude(amount=BOSS_EXTRUDE43_DEPTH)


with BuildPart() as part_36:
    add(part_35.part)

    # Combine36: cut body 2 36
    add(body_2_36.part, mode=Mode.SUBTRACT)


with BuildPart() as body_2_37:
    # Sketch44 → Boss-Extrude44 (new body)
    with BuildSketch(Plane.XY.offset(BOSS_EXTRUDE44_START)):
        with Locations((33, 64)):
            Circle(SKETCH44_R)
    extrude(amount=BOSS_EXTRUDE44_DEPTH)


with BuildPart() as part_37:
    add(part_36.part)

    # Combine37: cut body 2 37
    add(body_2_37.part, mode=Mode.SUBTRACT)


with BuildPart() as body_2_38:
    # Sketch45 → Boss-Extrude45 (new body)
    with BuildSketch(Plane.XY.offset(BOSS_EXTRUDE45_START)):
        with Locations((33, 70)):
            Circle(SKETCH45_R)
    extrude(amount=BOSS_EXTRUDE45_DEPTH)


with BuildPart() as part_38:
    add(part_37.part)

    # Combine38: cut body 2 38
    add(body_2_38.part, mode=Mode.SUBTRACT)


with BuildPart() as body_2_39:
    # Sketch46 → Boss-Extrude46 (new body)
    with BuildSketch(Plane.XY.offset(BOSS_EXTRUDE46_START)):
        with Locations((33, 70)):
            Circle(SKETCH46_R)
    extrude(amount=BOSS_EXTRUDE46_DEPTH)


with BuildPart() as part_39:
    add(part_38.part)

    # Combine39: cut body 2 39
    add(body_2_39.part, mode=Mode.SUBTRACT)

    # Sketch47 → Boss-Extrude47 (add)
    with BuildSketch(Plane(origin=(0, 0, 0), x_dir=(1, 0, 0), z_dir=(0, 1, 0)).offset(BOSS_EXTRUDE47_START)):
        with Locations((0, -46)):
            Circle(SKETCH47_R)
    extrude(amount=BOSS_EXTRUDE47_DEPTH)


with BuildPart() as body_2_40:
    # Sketch48 → Boss-Extrude48 (new body)
    with BuildSketch(Plane(origin=(0, 0, 0), x_dir=(1, 0, 0), z_dir=(0, 1, 0)).offset(BOSS_EXTRUDE48_START)):
        with Locations((0, -46)):
            Circle(SKETCH48_R)
    extrude(amount=BOSS_EXTRUDE48_DEPTH)


with BuildPart() as part_40:
    add(part_39.part)

    # Combine40: cut body 2 40
    add(body_2_40.part, mode=Mode.SUBTRACT)


solid = part_40.part
